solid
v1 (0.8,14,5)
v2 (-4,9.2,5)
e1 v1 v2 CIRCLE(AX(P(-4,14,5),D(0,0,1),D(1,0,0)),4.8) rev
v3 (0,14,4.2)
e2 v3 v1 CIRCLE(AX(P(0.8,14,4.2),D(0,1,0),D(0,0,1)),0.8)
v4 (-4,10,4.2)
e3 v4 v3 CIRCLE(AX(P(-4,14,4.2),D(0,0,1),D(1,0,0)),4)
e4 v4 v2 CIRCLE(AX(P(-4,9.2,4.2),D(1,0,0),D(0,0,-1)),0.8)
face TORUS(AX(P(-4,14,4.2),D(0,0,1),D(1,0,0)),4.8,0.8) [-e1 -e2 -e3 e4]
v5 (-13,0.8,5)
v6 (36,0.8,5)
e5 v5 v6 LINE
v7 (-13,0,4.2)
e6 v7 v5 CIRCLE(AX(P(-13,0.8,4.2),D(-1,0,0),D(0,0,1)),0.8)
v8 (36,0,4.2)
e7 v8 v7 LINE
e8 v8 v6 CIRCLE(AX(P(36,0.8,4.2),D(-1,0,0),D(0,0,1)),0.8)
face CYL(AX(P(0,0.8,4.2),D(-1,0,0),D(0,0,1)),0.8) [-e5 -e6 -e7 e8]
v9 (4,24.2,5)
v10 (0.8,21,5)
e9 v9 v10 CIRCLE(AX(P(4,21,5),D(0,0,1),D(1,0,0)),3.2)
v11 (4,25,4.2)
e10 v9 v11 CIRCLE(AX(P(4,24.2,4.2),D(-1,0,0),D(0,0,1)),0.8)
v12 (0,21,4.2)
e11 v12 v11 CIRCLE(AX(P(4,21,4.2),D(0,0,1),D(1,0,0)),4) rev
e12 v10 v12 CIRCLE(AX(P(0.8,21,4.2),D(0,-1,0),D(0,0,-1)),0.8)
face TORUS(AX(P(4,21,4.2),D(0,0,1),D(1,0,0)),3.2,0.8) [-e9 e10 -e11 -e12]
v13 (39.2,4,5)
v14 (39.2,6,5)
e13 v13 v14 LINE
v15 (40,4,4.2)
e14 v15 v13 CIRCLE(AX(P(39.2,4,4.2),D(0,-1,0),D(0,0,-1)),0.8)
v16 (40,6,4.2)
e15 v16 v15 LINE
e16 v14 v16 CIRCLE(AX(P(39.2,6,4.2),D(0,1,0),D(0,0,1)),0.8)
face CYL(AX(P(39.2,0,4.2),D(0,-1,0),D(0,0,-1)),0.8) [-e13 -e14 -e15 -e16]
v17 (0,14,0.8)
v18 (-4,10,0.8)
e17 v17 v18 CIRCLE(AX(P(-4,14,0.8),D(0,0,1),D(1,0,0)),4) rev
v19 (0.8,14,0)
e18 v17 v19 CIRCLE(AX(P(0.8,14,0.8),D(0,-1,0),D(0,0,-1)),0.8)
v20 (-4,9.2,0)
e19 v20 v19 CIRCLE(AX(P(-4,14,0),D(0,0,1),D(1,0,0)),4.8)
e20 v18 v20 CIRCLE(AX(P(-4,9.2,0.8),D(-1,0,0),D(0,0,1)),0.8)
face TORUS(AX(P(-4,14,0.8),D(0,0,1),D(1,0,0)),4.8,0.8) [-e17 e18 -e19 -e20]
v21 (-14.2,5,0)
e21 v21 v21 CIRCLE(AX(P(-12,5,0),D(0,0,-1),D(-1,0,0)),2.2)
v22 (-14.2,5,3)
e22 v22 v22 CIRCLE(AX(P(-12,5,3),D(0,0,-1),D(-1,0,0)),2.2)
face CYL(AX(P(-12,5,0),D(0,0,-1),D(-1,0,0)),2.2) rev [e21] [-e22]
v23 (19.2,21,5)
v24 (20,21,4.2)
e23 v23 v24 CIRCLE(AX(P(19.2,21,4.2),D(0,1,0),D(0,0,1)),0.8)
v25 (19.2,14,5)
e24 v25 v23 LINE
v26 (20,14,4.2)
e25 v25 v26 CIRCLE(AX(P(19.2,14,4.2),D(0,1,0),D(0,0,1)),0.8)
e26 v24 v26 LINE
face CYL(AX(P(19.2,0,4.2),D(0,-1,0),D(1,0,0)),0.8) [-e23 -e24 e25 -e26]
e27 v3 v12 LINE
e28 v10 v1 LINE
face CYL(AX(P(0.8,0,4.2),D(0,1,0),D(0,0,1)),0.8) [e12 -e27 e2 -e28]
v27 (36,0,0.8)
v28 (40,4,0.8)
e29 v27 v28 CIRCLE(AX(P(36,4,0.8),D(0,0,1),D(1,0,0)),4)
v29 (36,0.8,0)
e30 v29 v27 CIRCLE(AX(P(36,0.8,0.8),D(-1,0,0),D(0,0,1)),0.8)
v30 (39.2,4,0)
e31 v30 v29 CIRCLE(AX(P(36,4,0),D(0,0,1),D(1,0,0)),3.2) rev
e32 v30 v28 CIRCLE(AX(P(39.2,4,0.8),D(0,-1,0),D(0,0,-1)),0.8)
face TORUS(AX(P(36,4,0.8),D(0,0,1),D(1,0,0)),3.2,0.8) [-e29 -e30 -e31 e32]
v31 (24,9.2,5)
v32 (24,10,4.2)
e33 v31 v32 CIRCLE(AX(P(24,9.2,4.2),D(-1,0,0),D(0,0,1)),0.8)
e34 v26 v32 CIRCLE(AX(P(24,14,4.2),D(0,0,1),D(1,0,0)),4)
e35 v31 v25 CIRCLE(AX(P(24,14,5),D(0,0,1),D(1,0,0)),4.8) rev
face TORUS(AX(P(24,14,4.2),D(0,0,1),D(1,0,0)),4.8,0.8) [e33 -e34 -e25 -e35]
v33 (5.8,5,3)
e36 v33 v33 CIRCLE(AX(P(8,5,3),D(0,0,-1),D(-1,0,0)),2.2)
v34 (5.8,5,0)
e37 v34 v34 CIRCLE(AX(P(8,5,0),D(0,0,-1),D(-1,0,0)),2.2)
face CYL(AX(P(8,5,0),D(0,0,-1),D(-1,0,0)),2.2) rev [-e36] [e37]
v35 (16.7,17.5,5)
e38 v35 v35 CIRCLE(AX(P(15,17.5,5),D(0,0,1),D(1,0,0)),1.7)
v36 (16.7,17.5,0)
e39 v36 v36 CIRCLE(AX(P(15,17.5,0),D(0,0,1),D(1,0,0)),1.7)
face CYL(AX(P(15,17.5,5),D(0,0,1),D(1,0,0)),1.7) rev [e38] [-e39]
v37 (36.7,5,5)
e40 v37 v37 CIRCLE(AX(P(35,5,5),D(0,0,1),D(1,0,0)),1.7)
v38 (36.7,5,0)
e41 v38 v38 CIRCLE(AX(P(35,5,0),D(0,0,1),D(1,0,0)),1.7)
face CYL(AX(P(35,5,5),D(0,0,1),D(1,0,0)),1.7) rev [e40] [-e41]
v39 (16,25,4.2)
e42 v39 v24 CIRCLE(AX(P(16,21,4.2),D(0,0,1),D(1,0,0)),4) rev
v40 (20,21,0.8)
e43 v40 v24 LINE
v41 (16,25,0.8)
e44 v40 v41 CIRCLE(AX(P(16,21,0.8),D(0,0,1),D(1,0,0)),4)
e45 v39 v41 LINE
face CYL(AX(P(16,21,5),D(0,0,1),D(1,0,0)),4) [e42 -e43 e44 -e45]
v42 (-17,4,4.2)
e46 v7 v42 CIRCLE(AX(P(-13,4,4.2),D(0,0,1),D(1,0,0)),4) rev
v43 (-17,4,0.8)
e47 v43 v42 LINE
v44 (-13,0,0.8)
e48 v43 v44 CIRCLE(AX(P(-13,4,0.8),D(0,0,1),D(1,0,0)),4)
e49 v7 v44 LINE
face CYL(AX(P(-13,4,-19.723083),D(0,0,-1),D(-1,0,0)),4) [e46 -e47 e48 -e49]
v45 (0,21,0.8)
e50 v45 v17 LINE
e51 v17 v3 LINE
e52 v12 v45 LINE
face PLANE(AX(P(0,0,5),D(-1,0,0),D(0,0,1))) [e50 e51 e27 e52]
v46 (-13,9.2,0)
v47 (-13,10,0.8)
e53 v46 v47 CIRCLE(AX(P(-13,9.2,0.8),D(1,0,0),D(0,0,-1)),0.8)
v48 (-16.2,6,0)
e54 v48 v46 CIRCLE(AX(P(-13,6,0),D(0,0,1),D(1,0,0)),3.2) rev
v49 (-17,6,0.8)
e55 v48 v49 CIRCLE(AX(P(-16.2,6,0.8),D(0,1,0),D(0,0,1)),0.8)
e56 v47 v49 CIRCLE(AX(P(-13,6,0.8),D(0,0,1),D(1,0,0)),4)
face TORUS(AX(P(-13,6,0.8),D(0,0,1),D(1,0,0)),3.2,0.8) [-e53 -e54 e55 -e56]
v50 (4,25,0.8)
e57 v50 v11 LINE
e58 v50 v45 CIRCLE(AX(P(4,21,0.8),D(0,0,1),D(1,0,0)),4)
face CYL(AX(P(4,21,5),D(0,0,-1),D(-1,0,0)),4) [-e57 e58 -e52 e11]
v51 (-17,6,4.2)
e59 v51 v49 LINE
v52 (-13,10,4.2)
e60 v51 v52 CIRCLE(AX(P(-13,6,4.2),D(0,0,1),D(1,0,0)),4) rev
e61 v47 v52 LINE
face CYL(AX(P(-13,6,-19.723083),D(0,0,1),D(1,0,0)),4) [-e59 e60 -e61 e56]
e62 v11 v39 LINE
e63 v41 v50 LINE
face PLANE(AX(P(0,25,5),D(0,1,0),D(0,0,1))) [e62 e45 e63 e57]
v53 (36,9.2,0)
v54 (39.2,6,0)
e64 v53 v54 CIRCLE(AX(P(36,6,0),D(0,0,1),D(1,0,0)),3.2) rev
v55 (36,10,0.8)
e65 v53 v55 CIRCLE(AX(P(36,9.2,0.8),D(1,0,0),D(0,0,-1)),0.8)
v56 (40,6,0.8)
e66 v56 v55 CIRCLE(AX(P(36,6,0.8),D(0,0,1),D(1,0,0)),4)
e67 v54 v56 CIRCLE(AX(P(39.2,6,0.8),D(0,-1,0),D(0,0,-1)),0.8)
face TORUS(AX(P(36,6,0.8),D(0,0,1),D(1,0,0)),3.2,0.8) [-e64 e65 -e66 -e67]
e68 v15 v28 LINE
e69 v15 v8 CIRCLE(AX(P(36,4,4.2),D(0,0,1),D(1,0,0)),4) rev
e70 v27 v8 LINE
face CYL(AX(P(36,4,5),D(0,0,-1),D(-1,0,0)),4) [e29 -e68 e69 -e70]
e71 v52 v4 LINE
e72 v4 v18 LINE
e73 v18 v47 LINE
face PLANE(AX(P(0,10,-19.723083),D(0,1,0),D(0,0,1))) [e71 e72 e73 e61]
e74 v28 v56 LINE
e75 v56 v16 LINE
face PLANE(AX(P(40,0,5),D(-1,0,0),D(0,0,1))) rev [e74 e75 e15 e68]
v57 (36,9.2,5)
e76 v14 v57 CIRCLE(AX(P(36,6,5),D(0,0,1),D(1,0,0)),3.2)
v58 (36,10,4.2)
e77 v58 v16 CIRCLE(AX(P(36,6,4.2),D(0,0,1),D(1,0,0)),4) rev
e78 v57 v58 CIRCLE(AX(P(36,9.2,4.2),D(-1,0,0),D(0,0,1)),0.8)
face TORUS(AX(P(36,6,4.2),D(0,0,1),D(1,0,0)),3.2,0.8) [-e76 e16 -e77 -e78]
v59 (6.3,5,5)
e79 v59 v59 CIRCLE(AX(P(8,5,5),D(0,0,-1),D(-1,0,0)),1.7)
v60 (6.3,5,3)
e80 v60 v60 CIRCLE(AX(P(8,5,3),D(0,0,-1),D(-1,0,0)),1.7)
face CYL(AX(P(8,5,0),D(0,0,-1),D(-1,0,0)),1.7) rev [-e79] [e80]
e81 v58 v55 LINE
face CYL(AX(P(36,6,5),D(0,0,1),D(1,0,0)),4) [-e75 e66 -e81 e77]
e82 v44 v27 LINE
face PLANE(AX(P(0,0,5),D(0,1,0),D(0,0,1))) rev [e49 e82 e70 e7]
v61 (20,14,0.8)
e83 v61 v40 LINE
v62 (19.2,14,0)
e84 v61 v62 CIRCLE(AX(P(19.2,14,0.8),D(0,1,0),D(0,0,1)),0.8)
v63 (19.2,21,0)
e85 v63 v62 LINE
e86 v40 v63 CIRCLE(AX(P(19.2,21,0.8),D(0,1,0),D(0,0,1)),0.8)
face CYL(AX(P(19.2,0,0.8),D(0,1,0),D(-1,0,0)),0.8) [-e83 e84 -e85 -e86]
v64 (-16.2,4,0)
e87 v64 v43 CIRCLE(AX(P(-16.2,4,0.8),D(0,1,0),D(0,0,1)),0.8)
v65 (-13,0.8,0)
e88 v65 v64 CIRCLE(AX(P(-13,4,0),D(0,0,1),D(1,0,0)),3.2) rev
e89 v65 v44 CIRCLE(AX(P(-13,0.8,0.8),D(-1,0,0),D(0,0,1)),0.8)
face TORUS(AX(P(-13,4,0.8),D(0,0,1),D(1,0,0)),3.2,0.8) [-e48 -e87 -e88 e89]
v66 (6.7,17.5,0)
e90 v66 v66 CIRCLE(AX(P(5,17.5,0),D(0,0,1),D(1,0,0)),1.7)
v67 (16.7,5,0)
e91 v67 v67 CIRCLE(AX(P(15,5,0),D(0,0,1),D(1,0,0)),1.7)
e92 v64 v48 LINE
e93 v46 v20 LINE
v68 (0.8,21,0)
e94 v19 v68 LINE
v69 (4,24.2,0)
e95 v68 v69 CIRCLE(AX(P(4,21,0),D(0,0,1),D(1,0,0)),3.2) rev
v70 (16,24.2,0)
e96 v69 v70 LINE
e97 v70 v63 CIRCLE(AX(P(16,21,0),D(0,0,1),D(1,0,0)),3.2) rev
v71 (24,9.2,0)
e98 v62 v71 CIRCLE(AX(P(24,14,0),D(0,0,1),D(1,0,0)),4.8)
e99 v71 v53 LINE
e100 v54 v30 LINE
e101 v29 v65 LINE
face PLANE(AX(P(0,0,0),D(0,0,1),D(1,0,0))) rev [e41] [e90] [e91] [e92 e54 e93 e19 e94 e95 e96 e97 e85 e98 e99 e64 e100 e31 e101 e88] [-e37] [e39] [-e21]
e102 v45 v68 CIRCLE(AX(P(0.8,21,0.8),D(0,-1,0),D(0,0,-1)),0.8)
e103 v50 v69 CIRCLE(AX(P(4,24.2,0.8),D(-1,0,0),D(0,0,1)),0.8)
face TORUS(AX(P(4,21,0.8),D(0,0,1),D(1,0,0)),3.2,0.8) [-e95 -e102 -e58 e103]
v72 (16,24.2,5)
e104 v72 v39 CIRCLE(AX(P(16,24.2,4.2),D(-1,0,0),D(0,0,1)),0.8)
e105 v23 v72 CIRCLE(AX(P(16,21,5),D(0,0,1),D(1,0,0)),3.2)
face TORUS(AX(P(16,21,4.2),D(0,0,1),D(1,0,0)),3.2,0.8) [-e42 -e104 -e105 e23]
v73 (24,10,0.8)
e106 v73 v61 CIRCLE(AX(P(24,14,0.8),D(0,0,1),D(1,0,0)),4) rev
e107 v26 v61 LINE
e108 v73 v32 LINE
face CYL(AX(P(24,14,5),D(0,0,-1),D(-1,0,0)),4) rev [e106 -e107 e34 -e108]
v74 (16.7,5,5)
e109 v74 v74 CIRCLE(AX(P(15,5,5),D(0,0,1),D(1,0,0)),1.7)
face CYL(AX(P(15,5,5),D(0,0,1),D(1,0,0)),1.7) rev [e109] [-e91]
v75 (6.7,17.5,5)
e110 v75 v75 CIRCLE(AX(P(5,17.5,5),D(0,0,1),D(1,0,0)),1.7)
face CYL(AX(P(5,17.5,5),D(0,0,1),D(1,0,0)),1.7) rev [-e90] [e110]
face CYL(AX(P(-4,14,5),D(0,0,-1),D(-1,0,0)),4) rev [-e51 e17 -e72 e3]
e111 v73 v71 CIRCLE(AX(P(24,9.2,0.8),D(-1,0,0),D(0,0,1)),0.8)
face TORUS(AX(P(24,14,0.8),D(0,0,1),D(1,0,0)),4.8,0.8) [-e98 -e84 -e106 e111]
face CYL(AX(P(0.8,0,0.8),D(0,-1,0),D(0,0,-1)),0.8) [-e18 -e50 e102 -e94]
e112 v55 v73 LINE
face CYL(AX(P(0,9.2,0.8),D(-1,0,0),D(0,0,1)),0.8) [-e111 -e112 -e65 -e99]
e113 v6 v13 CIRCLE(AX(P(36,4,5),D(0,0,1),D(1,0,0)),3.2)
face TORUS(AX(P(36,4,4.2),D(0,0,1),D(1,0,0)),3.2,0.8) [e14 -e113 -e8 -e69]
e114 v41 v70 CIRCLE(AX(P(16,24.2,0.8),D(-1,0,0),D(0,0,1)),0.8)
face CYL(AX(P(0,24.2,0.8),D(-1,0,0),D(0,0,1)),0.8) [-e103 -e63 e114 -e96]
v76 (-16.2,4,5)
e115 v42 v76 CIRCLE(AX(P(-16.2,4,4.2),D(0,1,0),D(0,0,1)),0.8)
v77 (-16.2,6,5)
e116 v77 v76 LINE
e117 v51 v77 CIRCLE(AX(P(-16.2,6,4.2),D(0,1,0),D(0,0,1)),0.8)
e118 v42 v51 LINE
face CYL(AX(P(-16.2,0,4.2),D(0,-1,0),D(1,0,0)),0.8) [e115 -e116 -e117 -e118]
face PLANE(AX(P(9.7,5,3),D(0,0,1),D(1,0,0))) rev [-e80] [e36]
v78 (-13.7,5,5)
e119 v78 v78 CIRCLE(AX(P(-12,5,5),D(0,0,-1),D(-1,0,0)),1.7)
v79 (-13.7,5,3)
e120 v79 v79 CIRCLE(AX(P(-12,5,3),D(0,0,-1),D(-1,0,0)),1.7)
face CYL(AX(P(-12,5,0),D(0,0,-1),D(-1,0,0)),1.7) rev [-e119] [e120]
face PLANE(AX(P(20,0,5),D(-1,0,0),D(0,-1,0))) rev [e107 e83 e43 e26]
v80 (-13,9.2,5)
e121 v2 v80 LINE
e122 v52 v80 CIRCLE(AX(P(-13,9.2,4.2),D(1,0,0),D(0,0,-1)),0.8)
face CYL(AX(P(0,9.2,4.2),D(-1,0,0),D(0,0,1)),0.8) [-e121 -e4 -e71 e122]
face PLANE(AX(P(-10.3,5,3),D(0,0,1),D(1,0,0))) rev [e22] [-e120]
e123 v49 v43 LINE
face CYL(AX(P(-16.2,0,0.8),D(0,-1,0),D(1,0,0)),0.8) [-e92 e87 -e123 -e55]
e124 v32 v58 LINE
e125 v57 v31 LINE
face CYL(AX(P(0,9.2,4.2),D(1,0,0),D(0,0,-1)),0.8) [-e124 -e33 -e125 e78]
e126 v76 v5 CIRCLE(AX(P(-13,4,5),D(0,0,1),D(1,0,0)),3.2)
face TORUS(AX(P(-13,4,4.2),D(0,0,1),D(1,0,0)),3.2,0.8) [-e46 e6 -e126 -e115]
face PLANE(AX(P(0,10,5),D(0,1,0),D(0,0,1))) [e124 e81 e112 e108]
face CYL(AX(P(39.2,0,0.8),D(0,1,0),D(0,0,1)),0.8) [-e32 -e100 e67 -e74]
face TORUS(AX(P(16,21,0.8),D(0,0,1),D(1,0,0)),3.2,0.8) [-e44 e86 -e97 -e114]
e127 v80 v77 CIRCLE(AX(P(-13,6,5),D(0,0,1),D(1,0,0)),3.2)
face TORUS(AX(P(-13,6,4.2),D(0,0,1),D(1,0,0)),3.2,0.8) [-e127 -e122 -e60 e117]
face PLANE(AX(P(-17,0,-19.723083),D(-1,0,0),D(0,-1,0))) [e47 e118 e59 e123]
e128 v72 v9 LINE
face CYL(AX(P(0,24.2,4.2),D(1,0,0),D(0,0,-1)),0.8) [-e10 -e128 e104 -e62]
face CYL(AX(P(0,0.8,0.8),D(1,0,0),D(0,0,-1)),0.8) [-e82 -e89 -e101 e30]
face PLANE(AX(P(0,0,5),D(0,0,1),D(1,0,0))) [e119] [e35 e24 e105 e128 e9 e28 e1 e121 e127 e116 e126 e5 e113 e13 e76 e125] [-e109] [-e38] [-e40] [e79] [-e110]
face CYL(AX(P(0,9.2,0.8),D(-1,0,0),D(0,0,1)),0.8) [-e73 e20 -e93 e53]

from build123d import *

# Parameters (mm, degrees)
SKETCH1_W                    = 20
SKETCH1_H                    = 15
SKETCH1_W_2                  = 40
SKETCH1_H_2                  = 10
BOSS_EXTRUDE1_DEPTH          = 5
M3_CLEARANCE_HOLE1_OUTLINE_R = 1.7
M3_CLEARANCE_HOLE1_DEPTH     = 5
SKETCH4_W                    = 17
SKETCH4_H                    = 10
BOSS_EXTRUDE2_DEPTH          = 5
HOLE1_OUTLINE_R              = 2.2
HOLE1_DEPTH                  = 3
HOLE1_START                  = 3
HOLE1_2_OUTLINE_R            = 1.7
HOLE1_2_DEPTH                = 2
FILLET1_R                    = 4
FILLET2_R                    = 0.8


# Read off the part's stored shape, not the designer's step: M3 Clearance Hole1, Hole1
with BuildPart() as part:
    # Sketch1 → Boss-Extrude1 (new body)
    with BuildSketch(Plane.XY):
        with Locations((10, 17.5)):
            Rectangle(SKETCH1_W, SKETCH1_H)
        with Locations((20, 5)):
            Rectangle(SKETCH1_W_2, SKETCH1_H_2)
    extrude(amount=BOSS_EXTRUDE1_DEPTH)

    # M3 Clearance Hole1 outline → M3 Clearance Hole1 (cut)
    with BuildSketch(Plane.XY):
        with Locations((5, 17.5)):
            Circle(M3_CLEARANCE_HOLE1_OUTLINE_R)
        with Locations((15, 17.5)):
            Circle(M3_CLEARANCE_HOLE1_OUTLINE_R)
        with Locations((15, 5)):
            Circle(M3_CLEARANCE_HOLE1_OUTLINE_R)
        with Locations((35, 5)):
            Circle(M3_CLEARANCE_HOLE1_OUTLINE_R)
    extrude(amount=M3_CLEARANCE_HOLE1_DEPTH, mode=Mode.SUBTRACT)

    # Sketch4 → Boss-Extrude2 (add)
    with BuildSketch(Plane.XY.offset(5)):
        with Locations((-8.5, 5)):
            Rectangle(SKETCH4_W, SKETCH4_H)
    extrude(amount=-BOSS_EXTRUDE2_DEPTH)

    # Hole1 outline → Hole1 (cut)
    with BuildSketch(Plane.XY):
        with Locations((8, 5)):
            Circle(HOLE1_OUTLINE_R)
        with Locations((-12, 5)):
            Circle(HOLE1_OUTLINE_R)
    extrude(amount=HOLE1_DEPTH, mode=Mode.SUBTRACT)

    # Hole1 2 outline → Hole1 2 (cut)
    with BuildSketch(Plane.XY.offset(HOLE1_START)):
        with Locations((8, 5)):
            Circle(HOLE1_2_OUTLINE_R)
        with Locations((-12, 5)):
            Circle(HOLE1_2_OUTLINE_R)
    extrude(amount=HOLE1_2_DEPTH, mode=Mode.SUBTRACT)

    # Fillet1
    fillet1_edges = [part.edges().sort_by_distance(p)[0] for p in [
        (0, 25, 2.5),
        (20, 25, 2.5),
        (20, 10, 2.5),
        (40, 10, 2.5),
        (40, 0, 2.5),
        (0, 10, 2.5),
        (-17, 0, 2.5),
        (-17, 10, 2.5),
    ]]
    fillet(fillet1_edges, radius=FILLET1_R)

    # Fillet2
    fillet2_edges = [part.edges().sort_by_distance(p)[0] for p in [
        (21.171572875, 11.171572875, 0),
        (21.171572875, 11.171572875, 5),
        (-1.171572875, 11.171572875, 5),
        (-1.171572875, 11.171572875, 0),
        (-17, 5, 0),
        (-17, 5, 5),
        (0, 17.5, 5),
        (-8.5, 10, 5),
        (11.5, 0, 5),
        (40, 5, 5),
        (30, 10, 5),
        (20, 17.5, 5),
        (10, 25, 5),
        (1.171572875, 23.828427125, 5),
        (18.828427125, 23.828427125, 5),
        (38.828427125, 8.828427125, 5),
        (38.828427125, 1.171572875, 5),
        (-15.828427125, 8.828427125, 5),
        (-15.828427125, 1.171572875, 5),
        (11.5, 0, 0),
        (-8.5, 10, 0),
        (0, 17.5, 0),
        (10, 25, 0),
        (20, 17.5, 0),
        (30, 10, 0),
        (40, 5, 0),
        (1.171572875, 23.828427125, 0),
        (18.828427125, 23.828427125, 0),
        (38.828427125, 8.828427125, 0),
        (38.828427125, 1.171572875, 0),
        (-15.828427125, 8.828427125, 0),
        (-15.828427125, 1.171572875, 0),
    ]]
    fillet(fillet2_edges, radius=FILLET2_R)


solid = part.part
